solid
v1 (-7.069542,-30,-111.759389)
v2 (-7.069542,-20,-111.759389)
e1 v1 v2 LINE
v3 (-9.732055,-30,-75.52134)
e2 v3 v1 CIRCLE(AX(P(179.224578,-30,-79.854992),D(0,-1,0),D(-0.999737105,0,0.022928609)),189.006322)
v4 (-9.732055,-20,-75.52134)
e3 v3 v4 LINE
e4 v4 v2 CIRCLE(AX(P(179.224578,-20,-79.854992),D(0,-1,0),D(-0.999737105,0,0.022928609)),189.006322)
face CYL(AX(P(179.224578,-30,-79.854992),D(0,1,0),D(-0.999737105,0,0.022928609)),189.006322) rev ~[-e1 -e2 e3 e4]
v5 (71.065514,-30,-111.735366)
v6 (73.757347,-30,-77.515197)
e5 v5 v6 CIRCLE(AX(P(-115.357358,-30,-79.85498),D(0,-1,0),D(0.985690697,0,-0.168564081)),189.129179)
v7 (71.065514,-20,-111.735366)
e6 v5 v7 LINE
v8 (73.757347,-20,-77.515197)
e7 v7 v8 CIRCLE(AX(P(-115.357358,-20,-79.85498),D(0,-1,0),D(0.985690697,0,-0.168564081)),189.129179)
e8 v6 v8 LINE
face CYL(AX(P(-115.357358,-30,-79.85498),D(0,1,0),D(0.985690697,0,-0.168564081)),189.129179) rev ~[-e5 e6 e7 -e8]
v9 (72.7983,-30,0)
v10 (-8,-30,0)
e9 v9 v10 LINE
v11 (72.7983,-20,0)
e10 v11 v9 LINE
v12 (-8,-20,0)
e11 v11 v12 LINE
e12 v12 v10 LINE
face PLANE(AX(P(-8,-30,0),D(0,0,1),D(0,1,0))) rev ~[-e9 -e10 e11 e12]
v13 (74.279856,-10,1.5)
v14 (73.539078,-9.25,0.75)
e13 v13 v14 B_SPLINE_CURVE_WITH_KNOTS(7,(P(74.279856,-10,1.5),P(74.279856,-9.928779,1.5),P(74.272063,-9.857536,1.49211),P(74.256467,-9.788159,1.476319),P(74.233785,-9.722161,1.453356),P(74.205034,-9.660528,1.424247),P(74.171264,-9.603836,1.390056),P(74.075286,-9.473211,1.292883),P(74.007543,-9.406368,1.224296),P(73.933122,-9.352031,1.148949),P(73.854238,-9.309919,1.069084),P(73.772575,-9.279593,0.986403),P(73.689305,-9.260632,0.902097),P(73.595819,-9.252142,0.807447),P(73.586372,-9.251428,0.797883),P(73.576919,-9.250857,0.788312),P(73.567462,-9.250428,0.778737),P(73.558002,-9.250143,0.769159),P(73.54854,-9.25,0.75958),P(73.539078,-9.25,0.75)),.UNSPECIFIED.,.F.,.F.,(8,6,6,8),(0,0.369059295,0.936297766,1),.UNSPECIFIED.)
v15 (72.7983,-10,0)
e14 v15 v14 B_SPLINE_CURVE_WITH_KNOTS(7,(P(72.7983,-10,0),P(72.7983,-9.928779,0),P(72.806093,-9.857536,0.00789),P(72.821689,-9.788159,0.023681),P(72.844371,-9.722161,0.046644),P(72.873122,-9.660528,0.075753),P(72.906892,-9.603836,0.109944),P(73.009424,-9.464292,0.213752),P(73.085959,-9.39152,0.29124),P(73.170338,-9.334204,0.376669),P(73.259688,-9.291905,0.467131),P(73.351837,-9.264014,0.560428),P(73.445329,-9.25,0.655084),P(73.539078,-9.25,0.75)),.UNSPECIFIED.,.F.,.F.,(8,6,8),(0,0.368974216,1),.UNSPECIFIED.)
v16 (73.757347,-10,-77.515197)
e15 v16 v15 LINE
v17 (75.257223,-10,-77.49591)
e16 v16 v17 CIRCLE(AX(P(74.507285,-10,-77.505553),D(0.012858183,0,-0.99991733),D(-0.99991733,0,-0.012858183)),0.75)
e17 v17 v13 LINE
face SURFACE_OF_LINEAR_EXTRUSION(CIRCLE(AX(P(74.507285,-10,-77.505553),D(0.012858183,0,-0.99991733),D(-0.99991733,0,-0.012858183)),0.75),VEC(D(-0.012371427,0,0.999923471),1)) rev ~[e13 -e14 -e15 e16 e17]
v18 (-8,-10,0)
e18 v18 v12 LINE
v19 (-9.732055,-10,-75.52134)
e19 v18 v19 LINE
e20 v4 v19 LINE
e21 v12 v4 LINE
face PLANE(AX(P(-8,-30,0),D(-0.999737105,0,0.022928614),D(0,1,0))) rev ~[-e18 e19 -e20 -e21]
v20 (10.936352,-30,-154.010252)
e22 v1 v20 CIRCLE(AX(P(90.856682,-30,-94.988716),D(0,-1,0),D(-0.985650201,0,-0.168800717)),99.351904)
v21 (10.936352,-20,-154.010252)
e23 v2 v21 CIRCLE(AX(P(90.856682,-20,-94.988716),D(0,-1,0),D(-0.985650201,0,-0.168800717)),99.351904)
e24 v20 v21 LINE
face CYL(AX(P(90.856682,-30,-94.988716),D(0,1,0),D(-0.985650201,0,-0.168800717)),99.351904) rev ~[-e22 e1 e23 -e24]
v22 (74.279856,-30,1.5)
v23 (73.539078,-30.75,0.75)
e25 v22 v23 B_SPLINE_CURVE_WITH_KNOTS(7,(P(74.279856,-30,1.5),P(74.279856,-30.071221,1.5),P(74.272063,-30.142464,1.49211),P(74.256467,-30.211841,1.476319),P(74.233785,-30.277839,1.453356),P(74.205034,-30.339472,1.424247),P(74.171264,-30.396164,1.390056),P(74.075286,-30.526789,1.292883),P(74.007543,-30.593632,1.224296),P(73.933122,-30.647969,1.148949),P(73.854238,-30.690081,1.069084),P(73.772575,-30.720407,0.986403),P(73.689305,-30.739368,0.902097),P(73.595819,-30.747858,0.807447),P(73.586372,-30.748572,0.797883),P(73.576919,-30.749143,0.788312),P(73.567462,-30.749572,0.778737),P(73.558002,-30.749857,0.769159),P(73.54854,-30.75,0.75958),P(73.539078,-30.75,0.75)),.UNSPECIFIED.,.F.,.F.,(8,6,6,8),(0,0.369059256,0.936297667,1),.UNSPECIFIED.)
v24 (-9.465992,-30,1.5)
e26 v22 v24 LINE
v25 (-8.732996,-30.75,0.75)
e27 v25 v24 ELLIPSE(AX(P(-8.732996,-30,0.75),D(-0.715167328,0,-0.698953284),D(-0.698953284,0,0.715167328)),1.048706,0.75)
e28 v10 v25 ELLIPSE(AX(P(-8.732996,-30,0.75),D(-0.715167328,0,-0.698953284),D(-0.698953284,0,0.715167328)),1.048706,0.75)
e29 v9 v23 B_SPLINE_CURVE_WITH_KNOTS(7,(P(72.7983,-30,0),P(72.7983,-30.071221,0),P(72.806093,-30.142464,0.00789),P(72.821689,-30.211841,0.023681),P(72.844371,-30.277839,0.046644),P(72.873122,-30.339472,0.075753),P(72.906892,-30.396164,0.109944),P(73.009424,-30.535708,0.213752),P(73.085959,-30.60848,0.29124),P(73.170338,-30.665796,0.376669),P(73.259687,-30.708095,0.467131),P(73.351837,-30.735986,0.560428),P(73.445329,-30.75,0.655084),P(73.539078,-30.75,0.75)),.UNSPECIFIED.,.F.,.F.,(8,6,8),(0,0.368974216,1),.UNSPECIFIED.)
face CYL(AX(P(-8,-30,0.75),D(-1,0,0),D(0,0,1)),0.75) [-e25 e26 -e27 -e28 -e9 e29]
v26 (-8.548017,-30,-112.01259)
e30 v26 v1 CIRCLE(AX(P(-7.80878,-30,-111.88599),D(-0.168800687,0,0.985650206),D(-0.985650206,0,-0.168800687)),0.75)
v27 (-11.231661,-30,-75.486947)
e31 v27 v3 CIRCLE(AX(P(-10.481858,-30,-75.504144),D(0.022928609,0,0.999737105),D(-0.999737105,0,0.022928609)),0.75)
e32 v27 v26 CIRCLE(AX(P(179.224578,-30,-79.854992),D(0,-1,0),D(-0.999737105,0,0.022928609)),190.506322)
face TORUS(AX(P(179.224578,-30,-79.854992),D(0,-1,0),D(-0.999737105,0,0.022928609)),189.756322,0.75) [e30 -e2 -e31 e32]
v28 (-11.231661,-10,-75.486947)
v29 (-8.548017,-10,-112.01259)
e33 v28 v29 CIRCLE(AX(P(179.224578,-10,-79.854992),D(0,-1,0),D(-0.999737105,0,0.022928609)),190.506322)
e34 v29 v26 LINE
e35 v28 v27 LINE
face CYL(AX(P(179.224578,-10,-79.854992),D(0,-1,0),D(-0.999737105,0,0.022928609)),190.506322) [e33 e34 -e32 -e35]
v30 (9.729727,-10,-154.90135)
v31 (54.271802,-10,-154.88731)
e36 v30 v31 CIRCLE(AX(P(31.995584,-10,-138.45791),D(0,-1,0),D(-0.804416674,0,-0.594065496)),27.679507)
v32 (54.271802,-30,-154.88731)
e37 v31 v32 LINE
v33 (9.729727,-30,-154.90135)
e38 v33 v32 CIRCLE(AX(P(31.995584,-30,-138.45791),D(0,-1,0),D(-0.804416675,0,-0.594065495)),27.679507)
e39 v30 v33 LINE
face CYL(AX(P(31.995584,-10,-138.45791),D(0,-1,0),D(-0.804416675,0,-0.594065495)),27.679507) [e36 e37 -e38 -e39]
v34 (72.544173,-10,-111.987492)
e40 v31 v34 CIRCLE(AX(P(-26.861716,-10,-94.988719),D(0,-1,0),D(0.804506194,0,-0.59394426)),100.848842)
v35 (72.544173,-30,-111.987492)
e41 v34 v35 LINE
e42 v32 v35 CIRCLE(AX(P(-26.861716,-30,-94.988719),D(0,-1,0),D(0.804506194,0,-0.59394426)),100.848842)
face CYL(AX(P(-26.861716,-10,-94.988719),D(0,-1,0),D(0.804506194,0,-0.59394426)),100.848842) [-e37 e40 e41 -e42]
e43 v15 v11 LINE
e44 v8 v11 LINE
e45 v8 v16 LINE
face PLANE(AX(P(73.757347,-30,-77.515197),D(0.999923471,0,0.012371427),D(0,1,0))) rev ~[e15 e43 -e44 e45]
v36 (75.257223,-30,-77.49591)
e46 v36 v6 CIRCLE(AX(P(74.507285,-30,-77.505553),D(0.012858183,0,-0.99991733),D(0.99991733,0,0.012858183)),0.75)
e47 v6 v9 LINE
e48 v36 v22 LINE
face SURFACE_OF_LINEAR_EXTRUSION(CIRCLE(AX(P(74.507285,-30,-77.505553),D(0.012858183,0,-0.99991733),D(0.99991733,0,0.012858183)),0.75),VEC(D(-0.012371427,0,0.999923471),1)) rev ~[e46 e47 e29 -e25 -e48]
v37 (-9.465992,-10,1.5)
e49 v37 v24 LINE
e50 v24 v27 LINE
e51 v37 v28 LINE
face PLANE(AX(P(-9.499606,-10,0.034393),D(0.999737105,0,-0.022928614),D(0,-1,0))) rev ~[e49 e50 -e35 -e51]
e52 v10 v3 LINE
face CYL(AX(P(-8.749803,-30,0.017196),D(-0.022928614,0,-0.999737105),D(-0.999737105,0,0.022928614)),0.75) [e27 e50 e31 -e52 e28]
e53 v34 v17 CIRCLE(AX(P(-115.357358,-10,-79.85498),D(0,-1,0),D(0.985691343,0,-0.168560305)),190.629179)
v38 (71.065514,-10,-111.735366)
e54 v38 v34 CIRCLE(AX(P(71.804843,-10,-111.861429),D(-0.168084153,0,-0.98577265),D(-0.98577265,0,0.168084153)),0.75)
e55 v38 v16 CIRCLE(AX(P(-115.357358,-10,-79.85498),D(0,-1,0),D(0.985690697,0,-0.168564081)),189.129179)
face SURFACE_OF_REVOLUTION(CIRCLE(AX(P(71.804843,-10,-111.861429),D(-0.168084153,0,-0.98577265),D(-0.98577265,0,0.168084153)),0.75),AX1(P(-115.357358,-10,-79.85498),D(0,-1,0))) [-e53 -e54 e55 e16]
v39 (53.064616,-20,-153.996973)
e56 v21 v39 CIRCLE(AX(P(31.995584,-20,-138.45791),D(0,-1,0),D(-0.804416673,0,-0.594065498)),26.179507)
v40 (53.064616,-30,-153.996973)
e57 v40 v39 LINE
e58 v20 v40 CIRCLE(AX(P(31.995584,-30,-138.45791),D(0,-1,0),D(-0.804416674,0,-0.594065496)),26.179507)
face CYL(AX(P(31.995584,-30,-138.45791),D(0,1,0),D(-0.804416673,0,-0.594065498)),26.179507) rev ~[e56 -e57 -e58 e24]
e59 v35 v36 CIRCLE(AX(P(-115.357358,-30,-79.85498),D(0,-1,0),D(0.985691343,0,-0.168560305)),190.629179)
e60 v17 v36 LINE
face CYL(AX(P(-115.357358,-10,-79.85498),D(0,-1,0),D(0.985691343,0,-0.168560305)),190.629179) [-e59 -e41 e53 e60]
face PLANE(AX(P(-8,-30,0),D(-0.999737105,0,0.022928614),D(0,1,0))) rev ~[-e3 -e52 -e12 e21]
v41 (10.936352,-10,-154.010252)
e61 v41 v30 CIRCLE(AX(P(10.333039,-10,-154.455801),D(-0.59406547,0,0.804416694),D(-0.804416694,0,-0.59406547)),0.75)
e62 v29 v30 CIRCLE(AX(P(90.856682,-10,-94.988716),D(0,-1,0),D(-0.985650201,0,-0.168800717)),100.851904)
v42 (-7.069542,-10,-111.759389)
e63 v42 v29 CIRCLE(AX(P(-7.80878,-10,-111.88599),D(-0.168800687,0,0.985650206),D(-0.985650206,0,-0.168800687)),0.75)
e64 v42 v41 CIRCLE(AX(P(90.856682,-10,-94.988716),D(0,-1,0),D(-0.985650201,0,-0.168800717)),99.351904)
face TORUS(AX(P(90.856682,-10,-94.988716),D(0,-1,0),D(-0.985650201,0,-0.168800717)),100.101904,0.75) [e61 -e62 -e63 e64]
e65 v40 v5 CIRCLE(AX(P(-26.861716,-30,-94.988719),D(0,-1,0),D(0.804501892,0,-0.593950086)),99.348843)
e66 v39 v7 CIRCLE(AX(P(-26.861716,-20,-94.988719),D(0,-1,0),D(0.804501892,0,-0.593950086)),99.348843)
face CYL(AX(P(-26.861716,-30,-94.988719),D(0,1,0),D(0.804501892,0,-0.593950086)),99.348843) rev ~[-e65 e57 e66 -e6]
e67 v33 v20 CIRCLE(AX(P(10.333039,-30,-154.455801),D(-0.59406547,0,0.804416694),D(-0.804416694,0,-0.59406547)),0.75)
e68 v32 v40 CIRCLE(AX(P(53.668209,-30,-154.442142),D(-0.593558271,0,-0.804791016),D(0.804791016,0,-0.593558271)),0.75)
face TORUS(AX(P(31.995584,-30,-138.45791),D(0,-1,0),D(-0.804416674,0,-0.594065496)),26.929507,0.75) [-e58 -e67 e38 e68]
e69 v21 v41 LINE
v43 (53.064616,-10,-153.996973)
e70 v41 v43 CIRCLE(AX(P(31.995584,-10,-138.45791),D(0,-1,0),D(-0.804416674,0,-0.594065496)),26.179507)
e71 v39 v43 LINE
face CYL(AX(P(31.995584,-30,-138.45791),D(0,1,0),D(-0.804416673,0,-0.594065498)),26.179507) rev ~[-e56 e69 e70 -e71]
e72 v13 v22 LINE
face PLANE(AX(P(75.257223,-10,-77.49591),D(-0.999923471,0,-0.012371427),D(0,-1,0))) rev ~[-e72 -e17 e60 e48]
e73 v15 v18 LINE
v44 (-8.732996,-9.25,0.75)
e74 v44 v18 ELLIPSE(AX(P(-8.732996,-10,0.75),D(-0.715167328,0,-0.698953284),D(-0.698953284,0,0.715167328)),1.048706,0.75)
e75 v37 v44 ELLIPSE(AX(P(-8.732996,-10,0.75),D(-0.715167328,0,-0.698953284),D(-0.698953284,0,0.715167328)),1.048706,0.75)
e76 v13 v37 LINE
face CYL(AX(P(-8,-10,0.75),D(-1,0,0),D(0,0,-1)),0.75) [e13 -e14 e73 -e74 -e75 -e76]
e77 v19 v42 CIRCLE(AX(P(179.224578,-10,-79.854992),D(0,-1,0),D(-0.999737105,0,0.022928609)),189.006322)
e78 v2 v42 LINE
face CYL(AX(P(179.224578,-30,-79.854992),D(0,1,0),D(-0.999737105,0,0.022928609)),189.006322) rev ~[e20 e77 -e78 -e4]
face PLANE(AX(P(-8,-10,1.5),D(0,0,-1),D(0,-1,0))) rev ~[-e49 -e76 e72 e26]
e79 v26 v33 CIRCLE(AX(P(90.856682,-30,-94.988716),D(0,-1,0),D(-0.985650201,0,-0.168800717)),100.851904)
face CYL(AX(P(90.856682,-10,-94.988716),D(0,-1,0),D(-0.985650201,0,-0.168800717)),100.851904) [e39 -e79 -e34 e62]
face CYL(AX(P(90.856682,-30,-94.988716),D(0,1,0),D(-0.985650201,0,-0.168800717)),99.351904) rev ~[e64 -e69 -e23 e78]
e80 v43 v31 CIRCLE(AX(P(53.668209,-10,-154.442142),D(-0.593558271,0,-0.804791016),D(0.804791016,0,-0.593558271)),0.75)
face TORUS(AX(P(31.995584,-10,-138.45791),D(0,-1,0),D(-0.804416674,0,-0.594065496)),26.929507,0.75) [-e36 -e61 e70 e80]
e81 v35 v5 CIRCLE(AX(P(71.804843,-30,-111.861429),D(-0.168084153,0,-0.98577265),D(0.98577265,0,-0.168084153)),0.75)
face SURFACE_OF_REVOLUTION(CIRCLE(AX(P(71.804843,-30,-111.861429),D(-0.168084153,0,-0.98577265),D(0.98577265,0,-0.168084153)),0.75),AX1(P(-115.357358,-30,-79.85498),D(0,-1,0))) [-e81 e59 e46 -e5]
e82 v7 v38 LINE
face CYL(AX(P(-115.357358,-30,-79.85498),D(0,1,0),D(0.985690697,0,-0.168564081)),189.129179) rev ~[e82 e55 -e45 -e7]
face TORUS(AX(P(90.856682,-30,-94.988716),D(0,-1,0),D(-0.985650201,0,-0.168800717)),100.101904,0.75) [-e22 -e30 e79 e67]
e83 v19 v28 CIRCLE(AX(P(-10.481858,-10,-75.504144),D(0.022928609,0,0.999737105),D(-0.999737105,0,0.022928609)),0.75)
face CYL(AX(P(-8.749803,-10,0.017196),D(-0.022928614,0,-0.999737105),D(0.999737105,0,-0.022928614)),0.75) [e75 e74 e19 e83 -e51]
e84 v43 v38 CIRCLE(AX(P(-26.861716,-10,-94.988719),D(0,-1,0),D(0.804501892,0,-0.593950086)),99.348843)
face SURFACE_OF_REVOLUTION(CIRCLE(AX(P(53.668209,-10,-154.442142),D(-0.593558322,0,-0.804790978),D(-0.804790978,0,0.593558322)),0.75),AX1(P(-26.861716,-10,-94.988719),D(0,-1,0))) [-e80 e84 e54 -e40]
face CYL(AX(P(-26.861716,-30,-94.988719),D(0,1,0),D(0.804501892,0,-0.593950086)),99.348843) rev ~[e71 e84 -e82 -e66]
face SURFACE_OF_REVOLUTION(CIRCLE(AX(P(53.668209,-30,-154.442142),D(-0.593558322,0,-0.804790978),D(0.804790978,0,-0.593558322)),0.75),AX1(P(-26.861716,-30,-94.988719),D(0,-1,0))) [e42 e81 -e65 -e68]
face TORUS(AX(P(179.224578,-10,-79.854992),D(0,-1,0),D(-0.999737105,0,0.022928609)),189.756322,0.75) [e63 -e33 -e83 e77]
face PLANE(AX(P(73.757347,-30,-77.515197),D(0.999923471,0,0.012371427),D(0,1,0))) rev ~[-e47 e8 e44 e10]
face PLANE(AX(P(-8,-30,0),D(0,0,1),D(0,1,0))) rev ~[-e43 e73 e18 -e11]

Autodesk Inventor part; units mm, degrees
ref_plane "YZ Plane" through (0, 0, 0) normal (1, 0, 0) x (0, 1, 0)
ref_plane "XZ Plane" through (0, 0, 0) normal (0, 1, 0) x (-1, 0, 0)
ref_plane "XY Plane" through (0, 0, 0) normal (0, 0, 1) x (1, 0, 0)
ref_plane "Work Plane1" through (0, -20, -46.550515) normal (0, -1, 0) x (1, 0, 0)
sketch "Sketch3" plane through (0, 0, 0) normal (1, 0, 0) x (0, 1, 0)
  line L0 (-10, 0.75) -> (-30, 0.75) construction
  line L1 (-10, 1.5) -> (-30, 1.5)
  line L2 (-30, 0) -> (-10, 0)
  arc A0 (-10, 0) -> (-10, 1.5) centre (-10, 0.75) ccw
  arc A1 (-30, 1.5) -> (-30, 0) centre (-30, 0.75) ccw
  line L3 (-20, 0) -> (-20, -75.521339)
  point P0 (0, 0)
  point P1 (-20, 0.75)
  dimension "d0" = 1.5
  dimension "d1" = 20
sketch "Sketch2" plane through (0, -20, -46.550515) normal (0, -1, 0) x (1, 0, 0)
  spline S0 degree 3 poles (10.936352, -107.459737) (7.179934, -102.68902) (4.033535, -97.51867) (-5.225152, -78.100329) (-8.2872, -62.427946) (-10.142521, -35.374288) (-9.704535, -25.423748) (-8.723403, -10.3087) (-7.774117, -1.15603) (-5.538946, 14.831288) (-5.181485, 16.030381) (-4.552811, 20.183892) (-4.390113, 22.146158) (-3.922153, 24.896569) (-3.697268, 25.872669) (-3.076393, 27.34097) (-2.721493, 27.87477) (-1.646581, 28.921839) (-1.096468, 29.286827) (-0.472504, 29.537585) knots -4.25223397 -4.25223397 -4.25223397 -4.25223397 -3.9562506 -3.9562506 -3.20358637 -3.20358637 -2.63296418 -2.63296418 -1.91340599 -1.91340599 -1.25108329 -1.25108329 -0.74740313 -0.74740313 -0.45018243 -0.45018243 -0.20171856 -0.20171856 0 0 0 0
  spline S1 degree 3 poles (-0.472504, 29.537585) (1.662997, 30.394784) (3.76326, 31.18858) (12.066295, 33.674511) (18.105231, 34.719852) (34.355163, 36.098659) (44.970674, 35.327004) (58.349341, 31.895929) (61.353799, 30.795493) (64.451791, 29.553471) knots -7.76000275 -7.76000275 -7.76000275 -7.76000275 -6.95943849 -6.95943849 -5.26298404 -5.26298404 -2.25628604 -2.25628604 -0.98996136 -0.98996136 -0.98996136 -0.98996136
  spline S2 degree 3 poles (64.451791, 29.553471) (64.8398, 29.397595) (65.202558, 29.19622) (65.889779, 28.69381) (66.202675, 28.396571) (67.033071, 27.417933) (67.345172, 26.774592) (68.217927, 24.021686) (68.397755, 21.252198) (68.956077, 17.339933) (69.095411, 16.833196) (70.788197, 6.497314) (71.779174, -1.55009) (73.836501, -23.43642) (74.335881, -37.059566) (71.775195, -64.13545) (69.136912, -76.833848) (61.279747, -95.276855) (57.62611, -101.65135) (53.064616, -107.446458) knots -16.54715867 -16.54715867 -16.54715867 -16.54715867 -16.22687828 -16.22687828 -15.89511657 -15.89511657 -15.24378739 -15.24378739 -13.58830962 -13.58830962 -12.65182165 -12.65182165 -10.37688693 -10.37688693 -6.01428586 -6.01428586 -2.21250171 -2.21250171 0 0 0 0
  line L0 (53.064616, -107.446458) -> (10.936352, -107.459737)
  line L1 (-8, 46.550515) -> (72.7983, 46.550515)
  line L2 (72.7983, 46.550515) -> (72.7983, 36.550515)
  line L3 (72.7983, 36.550515) -> (-8, 36.550515)
  line L4 (-8, 36.550515) -> (-8, 46.550515)
  line L5 (-8, 46.550515) -> (72.7983, 46.550515)
  line L6 (72.7983, 46.550515) -> (72.7983, 36.550515)
  arc A0 (71.065514, -65.184851) -> (73.757347, -30.964682) centre (-115.357252, -33.304478) ccw
  arc A1 (53.064616, -107.446458) -> (71.065514, -65.184851) centre (-26.86172, -48.438202) ccw
  line L7 (-8, 46.550515) -> (-9.732055, -28.970825)
  arc A2 (-9.732055, -28.970825) -> (-7.069542, -65.208874) centre (179.224539, -33.304478) ccw
  arc A3 (-7.069542, -65.208874) -> (10.936352, -107.459737) centre (90.85668, -48.438202) ccw
  arc A4 (10.936352, -107.459737) -> (53.064616, -107.446458) centre (31.995584, -91.907395) ccw
  line L8 (73.757347, -30.964682) -> (72.7983, 46.550515)
  point P0 (0, 46.550515)
  dimension "d2" = 84.98872
  dimension "d7" = 10
  dimension "d8" = 80.7983
  dimension "d9" = 6.99704
  dimension "d10" = 8
sweep "Sweep1" add profiles "Sketch3" path "Sketch2" path curves A3 A4 A1 A0 L8 L1 L7 A2
properties part number "Strap"
